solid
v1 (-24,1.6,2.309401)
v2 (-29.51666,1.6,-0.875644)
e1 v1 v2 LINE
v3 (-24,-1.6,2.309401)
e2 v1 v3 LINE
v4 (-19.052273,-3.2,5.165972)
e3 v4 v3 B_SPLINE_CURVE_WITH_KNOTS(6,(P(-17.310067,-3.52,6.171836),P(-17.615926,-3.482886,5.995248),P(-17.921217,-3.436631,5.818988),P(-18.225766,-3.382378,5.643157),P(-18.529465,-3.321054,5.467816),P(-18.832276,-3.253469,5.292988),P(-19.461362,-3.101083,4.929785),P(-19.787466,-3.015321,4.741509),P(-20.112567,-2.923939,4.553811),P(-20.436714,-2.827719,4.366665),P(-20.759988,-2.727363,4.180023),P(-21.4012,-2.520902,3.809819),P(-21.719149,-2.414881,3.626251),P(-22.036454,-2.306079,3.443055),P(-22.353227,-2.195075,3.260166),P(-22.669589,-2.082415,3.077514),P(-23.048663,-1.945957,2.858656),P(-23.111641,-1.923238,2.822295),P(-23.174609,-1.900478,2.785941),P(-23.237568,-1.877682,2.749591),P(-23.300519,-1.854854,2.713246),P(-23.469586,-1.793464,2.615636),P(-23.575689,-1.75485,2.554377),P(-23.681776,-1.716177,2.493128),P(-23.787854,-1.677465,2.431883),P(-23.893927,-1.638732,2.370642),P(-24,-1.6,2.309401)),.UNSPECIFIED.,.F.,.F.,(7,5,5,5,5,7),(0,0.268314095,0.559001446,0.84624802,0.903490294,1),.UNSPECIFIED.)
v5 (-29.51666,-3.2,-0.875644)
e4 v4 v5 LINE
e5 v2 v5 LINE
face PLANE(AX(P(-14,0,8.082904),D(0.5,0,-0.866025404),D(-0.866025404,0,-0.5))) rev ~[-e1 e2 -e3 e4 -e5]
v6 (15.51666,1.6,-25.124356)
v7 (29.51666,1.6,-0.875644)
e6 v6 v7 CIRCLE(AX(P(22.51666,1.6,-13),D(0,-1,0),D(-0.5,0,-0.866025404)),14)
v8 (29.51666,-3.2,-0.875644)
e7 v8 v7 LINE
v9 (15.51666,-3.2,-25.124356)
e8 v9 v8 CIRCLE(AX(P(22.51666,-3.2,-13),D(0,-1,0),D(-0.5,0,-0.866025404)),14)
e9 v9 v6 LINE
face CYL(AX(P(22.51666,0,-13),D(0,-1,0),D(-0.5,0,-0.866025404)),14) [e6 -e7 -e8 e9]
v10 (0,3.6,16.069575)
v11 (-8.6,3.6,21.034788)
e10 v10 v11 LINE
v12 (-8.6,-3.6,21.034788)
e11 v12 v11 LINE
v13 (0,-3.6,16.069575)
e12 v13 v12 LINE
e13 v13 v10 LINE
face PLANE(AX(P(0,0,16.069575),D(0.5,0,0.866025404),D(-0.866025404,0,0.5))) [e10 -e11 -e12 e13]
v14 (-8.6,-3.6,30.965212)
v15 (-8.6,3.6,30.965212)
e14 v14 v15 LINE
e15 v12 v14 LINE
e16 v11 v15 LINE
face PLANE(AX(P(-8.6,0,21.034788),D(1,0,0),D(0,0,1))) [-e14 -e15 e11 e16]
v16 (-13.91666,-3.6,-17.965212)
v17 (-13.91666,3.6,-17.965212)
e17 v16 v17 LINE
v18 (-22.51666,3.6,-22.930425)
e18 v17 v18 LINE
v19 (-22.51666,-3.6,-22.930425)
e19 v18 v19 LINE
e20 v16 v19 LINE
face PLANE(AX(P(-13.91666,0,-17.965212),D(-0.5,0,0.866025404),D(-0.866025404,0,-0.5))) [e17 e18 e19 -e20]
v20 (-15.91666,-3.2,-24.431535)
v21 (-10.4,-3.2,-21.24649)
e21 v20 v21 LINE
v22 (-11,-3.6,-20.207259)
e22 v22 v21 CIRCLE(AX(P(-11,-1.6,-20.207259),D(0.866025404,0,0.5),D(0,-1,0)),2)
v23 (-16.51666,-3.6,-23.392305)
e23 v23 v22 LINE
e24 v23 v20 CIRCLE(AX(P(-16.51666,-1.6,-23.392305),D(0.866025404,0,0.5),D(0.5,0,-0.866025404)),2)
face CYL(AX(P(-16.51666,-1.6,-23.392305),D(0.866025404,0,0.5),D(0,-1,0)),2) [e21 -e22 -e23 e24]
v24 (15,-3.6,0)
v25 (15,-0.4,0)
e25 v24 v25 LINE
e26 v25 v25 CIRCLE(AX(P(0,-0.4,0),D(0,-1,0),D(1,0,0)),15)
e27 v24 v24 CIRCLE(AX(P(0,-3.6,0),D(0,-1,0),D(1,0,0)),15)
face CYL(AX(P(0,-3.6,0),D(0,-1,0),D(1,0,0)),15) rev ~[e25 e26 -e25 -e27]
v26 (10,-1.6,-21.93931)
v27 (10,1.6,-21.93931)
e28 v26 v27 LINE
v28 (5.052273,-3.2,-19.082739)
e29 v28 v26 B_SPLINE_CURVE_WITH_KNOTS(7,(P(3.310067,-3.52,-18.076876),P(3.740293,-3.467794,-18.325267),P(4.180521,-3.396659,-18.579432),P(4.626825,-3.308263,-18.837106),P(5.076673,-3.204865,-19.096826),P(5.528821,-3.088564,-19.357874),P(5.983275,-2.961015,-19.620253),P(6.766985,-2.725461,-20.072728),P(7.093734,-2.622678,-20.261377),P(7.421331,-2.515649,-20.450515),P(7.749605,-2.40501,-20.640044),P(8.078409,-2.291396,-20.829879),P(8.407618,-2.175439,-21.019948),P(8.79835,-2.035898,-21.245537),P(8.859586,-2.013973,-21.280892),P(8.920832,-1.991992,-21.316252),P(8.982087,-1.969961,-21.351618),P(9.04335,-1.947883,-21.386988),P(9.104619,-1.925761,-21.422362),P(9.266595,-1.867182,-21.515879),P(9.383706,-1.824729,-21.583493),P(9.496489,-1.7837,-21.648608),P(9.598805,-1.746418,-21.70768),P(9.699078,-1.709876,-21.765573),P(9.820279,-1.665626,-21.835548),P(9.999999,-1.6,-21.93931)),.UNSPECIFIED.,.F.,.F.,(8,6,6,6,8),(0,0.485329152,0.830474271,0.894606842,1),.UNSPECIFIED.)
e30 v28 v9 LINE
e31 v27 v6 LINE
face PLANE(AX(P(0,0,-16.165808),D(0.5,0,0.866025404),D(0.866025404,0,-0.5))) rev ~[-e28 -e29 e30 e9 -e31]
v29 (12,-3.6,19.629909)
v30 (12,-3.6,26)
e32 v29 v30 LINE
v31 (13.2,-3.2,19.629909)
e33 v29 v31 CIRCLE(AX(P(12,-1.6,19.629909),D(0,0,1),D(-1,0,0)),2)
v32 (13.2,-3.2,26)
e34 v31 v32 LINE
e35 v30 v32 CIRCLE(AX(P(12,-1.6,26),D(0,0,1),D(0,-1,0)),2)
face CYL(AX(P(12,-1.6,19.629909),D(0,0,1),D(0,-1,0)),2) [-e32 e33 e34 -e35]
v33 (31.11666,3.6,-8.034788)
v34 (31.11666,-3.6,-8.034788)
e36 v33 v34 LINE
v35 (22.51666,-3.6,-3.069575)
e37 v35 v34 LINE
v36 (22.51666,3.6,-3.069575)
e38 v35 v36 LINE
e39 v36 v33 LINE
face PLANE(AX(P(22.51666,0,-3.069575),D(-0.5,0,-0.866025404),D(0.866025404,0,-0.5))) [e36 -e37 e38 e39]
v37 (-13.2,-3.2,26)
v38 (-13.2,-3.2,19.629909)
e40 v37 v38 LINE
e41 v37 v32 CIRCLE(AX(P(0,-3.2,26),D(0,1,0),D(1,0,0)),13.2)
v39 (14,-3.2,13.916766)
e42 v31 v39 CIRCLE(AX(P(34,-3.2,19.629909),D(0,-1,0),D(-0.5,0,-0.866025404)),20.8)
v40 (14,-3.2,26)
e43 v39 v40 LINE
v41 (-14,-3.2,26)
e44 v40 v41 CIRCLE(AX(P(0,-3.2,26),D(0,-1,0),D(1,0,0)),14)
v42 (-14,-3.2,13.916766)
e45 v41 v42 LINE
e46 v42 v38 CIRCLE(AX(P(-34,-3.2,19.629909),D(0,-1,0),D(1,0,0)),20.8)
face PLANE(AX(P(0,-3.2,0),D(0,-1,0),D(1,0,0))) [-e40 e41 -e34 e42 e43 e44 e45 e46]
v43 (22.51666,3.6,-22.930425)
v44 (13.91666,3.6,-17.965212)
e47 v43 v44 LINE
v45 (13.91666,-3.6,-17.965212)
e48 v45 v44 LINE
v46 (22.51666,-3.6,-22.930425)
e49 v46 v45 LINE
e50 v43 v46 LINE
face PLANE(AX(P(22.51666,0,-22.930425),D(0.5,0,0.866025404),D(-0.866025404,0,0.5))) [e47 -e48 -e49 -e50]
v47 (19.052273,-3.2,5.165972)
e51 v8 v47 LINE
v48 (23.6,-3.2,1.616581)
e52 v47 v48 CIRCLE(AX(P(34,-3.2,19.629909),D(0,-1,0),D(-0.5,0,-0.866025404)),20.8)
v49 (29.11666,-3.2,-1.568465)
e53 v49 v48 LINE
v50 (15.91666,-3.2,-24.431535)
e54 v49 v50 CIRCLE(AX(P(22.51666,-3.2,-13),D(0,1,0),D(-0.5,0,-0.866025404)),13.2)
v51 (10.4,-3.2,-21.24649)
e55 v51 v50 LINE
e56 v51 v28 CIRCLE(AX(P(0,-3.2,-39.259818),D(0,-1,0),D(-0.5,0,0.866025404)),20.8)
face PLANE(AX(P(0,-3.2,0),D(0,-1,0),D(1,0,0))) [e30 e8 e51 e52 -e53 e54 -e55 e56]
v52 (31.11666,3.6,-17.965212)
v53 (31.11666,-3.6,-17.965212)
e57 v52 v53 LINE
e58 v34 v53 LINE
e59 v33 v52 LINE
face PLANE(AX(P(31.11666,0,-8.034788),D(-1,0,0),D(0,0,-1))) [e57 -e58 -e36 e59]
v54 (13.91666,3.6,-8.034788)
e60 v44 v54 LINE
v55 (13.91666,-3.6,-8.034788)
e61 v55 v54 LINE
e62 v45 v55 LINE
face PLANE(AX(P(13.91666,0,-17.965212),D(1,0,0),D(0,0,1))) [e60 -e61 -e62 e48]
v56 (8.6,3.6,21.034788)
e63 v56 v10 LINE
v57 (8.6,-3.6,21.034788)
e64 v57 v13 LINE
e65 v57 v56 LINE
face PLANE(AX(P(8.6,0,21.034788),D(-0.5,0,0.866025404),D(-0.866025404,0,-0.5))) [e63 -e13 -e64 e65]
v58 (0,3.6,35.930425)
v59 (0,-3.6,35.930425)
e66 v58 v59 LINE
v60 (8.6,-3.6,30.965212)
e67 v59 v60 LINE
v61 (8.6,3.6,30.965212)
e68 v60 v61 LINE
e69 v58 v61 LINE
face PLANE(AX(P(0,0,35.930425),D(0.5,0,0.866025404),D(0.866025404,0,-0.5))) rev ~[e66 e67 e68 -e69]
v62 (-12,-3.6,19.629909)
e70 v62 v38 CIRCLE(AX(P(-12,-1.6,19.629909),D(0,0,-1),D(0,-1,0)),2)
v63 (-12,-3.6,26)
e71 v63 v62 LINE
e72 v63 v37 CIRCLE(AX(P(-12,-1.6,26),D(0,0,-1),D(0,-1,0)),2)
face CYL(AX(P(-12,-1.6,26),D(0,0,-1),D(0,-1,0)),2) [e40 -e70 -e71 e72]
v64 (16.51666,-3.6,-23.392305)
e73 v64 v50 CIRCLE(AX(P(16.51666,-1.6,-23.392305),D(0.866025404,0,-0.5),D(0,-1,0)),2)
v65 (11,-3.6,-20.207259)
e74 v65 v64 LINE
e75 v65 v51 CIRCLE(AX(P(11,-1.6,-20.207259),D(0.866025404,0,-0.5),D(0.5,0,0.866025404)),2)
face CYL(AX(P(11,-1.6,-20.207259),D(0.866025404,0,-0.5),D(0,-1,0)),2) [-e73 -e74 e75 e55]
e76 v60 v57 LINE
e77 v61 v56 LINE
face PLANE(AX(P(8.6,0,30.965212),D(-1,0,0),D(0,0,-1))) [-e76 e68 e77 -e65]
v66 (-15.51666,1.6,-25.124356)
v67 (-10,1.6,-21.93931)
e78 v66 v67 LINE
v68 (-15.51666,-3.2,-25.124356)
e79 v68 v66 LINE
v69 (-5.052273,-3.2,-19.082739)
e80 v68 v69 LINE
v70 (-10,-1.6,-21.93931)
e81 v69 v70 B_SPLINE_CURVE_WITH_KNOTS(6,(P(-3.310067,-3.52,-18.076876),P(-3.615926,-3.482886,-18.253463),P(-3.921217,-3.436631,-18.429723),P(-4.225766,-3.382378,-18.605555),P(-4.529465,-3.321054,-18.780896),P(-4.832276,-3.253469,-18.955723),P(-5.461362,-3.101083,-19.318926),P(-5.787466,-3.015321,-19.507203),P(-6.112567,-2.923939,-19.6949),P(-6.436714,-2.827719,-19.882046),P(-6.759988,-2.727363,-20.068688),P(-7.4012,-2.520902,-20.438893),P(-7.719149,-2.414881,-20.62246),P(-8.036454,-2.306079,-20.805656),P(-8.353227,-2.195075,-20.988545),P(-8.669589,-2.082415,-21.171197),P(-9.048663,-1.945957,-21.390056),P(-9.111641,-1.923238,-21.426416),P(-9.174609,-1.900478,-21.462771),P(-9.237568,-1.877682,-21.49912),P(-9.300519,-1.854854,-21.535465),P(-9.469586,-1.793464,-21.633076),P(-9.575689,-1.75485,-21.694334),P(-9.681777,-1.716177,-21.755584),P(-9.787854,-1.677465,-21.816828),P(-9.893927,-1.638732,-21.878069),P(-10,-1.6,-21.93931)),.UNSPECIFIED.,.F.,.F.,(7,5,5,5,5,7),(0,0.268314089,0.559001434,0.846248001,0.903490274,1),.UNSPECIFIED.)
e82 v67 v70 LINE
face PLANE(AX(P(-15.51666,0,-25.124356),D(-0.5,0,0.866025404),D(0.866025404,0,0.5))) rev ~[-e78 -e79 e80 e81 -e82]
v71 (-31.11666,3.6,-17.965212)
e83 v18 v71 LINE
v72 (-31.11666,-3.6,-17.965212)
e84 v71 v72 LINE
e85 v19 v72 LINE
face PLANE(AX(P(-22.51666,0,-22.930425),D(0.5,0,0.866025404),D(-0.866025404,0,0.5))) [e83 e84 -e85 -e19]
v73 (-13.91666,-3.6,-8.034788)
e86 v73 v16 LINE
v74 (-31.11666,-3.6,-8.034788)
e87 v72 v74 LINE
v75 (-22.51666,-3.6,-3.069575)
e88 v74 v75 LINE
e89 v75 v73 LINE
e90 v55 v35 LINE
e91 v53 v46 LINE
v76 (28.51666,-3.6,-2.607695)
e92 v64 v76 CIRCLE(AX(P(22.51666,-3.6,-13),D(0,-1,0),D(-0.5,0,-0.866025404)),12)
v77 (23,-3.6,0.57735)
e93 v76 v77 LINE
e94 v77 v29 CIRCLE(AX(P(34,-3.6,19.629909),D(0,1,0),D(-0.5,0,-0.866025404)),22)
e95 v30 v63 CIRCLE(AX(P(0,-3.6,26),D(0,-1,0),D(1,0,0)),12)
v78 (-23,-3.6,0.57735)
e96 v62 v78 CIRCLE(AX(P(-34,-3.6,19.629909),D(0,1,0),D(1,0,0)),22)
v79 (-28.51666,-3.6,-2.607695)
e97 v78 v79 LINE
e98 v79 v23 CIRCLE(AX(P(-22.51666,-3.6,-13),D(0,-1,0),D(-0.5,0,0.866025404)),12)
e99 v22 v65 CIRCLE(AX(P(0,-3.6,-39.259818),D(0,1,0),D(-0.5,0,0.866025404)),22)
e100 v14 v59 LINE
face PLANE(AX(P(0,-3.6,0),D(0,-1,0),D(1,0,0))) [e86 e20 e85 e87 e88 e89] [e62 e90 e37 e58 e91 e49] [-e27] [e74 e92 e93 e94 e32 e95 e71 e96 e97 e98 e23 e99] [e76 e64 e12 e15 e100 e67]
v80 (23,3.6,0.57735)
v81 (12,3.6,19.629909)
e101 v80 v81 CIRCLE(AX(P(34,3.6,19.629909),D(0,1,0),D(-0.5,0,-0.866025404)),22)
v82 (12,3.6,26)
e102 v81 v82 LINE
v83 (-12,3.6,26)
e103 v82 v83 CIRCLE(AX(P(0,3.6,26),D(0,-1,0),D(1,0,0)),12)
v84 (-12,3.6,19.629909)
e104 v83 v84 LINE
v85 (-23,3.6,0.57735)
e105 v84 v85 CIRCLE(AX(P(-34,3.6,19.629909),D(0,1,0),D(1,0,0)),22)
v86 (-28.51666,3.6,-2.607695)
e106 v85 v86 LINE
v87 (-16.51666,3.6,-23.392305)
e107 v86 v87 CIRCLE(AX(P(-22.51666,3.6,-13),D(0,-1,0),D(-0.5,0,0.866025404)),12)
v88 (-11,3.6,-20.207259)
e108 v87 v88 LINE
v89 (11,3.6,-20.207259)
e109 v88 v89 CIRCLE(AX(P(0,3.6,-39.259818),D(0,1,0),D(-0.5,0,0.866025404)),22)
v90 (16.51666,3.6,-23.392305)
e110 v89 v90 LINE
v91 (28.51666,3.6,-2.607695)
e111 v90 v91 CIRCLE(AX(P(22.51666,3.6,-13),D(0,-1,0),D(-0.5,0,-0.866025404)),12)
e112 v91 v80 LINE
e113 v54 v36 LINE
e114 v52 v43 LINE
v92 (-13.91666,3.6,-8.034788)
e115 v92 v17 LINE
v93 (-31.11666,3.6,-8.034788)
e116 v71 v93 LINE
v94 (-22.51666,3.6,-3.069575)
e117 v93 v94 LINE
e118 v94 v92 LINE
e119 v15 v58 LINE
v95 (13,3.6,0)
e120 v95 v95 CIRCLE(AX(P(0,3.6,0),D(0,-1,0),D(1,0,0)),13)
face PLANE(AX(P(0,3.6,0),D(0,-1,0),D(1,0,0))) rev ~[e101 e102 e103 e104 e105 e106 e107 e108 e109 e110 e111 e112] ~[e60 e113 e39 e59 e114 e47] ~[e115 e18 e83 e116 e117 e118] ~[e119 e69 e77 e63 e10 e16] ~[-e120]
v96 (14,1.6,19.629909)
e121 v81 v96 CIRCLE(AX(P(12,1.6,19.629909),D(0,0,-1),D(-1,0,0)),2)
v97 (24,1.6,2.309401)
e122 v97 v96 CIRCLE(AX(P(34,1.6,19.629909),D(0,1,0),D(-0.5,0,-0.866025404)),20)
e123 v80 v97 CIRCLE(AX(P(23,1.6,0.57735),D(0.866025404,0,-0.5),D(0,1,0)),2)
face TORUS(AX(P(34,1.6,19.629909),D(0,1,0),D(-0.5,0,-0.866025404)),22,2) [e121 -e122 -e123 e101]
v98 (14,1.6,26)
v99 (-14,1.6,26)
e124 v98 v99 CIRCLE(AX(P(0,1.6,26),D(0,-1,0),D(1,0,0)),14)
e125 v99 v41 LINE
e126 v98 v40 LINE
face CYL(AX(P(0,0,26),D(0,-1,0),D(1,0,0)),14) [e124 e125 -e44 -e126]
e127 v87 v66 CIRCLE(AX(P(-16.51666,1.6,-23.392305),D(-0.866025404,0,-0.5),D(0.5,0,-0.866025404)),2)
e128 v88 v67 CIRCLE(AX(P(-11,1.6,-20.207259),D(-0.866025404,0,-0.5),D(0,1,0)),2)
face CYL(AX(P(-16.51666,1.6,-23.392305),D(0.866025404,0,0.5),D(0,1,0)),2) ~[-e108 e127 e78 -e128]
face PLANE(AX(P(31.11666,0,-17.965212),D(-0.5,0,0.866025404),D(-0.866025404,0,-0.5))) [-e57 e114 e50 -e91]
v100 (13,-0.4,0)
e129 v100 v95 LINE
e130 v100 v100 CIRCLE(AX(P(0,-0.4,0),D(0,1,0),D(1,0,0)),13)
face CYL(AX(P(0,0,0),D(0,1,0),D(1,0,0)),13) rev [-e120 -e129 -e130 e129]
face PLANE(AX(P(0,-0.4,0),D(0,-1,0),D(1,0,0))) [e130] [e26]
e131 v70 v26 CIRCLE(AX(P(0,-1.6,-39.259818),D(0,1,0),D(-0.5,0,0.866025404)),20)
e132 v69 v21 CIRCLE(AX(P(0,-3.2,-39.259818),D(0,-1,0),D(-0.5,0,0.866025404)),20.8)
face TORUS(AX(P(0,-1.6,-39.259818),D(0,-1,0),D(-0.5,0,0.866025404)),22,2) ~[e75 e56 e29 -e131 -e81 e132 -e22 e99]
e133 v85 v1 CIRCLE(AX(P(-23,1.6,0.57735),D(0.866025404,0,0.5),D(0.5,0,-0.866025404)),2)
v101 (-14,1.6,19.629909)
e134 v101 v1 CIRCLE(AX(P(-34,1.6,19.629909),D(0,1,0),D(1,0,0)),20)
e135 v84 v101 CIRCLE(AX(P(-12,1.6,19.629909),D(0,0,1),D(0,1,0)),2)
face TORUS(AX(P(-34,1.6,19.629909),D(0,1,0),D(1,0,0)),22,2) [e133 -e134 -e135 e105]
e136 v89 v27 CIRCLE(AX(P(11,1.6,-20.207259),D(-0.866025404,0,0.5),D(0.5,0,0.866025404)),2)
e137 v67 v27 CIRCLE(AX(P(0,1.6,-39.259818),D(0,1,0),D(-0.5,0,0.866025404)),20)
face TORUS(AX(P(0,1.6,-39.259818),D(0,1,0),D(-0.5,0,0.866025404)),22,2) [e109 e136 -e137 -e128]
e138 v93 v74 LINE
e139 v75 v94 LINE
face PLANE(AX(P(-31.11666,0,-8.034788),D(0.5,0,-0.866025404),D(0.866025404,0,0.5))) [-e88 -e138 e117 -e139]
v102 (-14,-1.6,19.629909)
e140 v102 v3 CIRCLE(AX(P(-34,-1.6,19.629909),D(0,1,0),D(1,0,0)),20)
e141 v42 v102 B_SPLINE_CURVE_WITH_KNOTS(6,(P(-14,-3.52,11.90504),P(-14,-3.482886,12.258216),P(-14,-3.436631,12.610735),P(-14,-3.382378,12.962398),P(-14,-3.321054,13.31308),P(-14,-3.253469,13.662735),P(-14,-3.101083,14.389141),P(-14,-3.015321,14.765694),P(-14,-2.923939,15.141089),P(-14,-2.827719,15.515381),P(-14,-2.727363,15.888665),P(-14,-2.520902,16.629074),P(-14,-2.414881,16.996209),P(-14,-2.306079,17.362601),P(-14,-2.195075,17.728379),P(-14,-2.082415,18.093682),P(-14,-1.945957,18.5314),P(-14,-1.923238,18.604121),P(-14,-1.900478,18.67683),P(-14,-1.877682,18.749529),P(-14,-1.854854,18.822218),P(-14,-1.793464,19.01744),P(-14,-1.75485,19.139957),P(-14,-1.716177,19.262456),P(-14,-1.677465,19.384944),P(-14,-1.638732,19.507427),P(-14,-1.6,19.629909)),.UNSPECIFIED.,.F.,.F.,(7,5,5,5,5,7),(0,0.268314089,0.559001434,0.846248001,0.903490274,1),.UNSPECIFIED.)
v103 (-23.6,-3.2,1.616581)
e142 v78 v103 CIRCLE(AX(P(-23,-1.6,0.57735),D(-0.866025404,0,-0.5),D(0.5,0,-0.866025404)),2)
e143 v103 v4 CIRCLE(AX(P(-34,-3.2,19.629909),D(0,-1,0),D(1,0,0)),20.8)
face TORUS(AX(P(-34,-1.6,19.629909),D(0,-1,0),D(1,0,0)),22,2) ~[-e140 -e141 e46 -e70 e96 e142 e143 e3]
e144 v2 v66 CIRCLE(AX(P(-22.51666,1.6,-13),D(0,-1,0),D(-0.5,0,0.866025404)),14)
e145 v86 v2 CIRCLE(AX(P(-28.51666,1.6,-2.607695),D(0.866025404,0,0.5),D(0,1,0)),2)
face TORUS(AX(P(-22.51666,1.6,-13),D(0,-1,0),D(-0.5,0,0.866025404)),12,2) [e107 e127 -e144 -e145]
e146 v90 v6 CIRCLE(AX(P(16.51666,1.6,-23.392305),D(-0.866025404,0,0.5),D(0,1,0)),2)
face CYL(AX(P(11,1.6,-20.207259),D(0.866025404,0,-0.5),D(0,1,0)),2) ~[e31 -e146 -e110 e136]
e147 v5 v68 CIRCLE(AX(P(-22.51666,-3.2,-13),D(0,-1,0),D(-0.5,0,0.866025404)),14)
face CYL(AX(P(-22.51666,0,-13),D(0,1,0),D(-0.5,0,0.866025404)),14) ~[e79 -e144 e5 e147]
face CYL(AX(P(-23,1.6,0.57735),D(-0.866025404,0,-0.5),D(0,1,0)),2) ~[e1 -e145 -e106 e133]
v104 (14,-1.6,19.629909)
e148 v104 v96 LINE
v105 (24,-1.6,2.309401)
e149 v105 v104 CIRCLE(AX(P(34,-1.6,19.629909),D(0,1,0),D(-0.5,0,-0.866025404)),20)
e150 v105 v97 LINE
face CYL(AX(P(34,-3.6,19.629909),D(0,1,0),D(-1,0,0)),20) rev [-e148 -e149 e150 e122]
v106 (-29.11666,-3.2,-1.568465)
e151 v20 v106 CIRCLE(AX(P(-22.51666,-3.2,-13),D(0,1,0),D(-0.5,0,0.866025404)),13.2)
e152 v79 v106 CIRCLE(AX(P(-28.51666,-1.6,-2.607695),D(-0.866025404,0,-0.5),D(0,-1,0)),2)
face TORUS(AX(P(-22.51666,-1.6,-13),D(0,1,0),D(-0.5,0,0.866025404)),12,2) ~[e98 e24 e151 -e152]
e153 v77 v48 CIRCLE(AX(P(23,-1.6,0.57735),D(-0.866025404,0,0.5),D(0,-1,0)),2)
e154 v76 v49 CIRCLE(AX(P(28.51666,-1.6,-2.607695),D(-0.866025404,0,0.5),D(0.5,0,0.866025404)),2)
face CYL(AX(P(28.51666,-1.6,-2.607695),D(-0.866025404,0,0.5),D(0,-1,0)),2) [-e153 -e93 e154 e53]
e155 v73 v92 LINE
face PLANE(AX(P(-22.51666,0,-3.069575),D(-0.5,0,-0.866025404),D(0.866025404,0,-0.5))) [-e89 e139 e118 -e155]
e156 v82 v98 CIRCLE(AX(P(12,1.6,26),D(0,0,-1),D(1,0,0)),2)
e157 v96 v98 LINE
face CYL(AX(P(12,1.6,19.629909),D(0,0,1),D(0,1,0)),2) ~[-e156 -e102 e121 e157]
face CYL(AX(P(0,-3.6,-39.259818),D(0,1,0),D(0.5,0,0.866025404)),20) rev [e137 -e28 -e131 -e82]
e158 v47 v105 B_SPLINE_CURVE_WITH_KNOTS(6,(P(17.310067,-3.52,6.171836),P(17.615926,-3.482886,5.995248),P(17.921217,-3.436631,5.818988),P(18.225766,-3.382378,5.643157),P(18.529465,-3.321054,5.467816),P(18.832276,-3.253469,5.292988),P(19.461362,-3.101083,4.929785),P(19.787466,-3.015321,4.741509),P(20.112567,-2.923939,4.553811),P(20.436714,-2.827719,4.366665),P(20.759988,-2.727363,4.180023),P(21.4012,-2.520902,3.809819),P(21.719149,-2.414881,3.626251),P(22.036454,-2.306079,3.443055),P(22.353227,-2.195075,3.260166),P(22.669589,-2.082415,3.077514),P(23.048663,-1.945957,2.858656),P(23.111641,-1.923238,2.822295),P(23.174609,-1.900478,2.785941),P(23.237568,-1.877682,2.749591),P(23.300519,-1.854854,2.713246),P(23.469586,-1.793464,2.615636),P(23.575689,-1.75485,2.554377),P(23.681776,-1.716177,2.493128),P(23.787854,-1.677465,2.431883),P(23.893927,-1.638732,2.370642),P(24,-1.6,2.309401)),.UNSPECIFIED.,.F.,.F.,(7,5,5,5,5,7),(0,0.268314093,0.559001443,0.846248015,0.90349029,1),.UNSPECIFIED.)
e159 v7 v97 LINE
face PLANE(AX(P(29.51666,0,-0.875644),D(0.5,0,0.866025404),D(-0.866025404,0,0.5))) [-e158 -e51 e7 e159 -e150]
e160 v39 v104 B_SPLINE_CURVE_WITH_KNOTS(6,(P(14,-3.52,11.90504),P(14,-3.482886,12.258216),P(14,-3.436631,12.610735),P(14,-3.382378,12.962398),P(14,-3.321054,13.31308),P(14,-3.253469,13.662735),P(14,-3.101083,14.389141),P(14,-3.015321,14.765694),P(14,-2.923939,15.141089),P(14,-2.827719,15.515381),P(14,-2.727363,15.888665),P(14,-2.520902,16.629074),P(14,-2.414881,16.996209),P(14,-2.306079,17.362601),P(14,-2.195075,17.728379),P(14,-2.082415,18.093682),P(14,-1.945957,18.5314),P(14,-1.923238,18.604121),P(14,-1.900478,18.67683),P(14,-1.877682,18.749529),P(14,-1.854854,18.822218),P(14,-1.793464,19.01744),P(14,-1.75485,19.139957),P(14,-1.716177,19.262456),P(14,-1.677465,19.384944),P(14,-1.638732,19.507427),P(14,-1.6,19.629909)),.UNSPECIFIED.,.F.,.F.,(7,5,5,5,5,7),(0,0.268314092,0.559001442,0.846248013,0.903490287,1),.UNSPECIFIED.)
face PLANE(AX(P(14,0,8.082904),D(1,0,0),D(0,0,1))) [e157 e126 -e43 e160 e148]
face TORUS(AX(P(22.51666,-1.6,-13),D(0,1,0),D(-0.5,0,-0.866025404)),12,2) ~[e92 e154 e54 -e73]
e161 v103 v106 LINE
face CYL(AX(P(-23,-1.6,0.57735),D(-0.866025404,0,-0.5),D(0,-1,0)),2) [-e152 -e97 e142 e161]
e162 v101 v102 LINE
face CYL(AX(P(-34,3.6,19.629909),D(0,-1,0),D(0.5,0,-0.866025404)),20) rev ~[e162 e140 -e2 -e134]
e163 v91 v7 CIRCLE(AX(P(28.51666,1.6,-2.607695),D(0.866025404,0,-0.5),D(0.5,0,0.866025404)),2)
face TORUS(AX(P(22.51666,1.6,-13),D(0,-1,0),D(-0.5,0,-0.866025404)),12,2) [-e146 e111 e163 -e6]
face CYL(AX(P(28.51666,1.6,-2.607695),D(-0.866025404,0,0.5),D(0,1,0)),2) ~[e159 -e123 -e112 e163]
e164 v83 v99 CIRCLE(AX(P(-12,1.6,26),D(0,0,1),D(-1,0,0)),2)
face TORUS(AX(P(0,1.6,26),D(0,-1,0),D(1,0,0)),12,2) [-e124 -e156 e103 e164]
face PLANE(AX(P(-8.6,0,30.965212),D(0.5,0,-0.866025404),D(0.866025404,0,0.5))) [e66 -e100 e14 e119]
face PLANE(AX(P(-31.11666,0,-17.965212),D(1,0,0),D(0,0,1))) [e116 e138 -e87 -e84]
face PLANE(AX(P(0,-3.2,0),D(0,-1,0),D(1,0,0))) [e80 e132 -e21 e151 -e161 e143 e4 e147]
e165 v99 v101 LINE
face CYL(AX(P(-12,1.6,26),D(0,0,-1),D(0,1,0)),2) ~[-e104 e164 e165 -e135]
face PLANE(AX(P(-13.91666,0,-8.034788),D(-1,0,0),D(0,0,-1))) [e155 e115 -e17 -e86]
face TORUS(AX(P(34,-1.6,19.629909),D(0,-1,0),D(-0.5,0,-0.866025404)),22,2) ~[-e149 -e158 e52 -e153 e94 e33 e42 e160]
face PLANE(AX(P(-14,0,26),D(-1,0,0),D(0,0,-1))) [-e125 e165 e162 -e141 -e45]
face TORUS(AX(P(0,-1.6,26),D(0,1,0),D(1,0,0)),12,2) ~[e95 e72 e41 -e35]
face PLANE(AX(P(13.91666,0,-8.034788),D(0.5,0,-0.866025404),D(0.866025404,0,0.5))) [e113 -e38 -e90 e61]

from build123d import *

# Parameters (mm, degrees)
F0_R     = 13
F1_DEPTH = 3.6
F2_R     = 20
F3_R     = 2
F4_R     = 2
F5_DEPTH = 3.2
F6_R     = 15
F7_DEPTH = 3.2


# Not quite as in the source:
# - a feature names something its author has since deleted; it is built from what else it names


with BuildPart() as f1:
    # F0 (on Front) → F1 (new body, symmetric)
    with BuildSketch(Plane.XZ):
        with BuildLine():
            Line((14, 8.0829037687), (14, 26))
            ThreePointArc((14, 26), (0, 40), (-14, 26))
            Line((-14, 26), (-14, 8.0829037687))
            Line((-14, 8.0829037687), (-29.5166604984, -0.875644347))
            ThreePointArc((-29.5166604984, -0.875644347), (-34.6410161514, -20), (-15.5166604984, -25.124355653))
            Line((-15.5166604984, -25.124355653), (0, -16.1658075373))
            Line((0, -16.1658075373), (15.5166604984, -25.124355653))
            ThreePointArc((15.5166604984, -25.124355653), (34.6410161514, -20), (29.5166604984, -0.875644347))
            Line((29.5166604984, -0.875644347), (14, 8.0829037687))
        make_face()
        Polygon((-22.5166604984, -22.9304246301), (-31.1166604984, -17.965212315), (-31.1166604984, -8.034787685), (-22.5166604984, -3.0695753699), (-13.9166604984, -8.034787685), (-13.9166604984, -17.965212315), align=None, mode=Mode.SUBTRACT)
        Polygon((31.1166604984, -8.034787685), (31.1166604984, -17.965212315), (22.5166604984, -22.9304246301), (13.9166604984, -17.965212315), (13.9166604984, -8.034787685), (22.5166604984, -3.0695753699), align=None, mode=Mode.SUBTRACT)
        Circle(F0_R, mode=Mode.SUBTRACT)
        Polygon((0, 35.9304246301), (8.6, 30.965212315), (8.6, 21.034787685), (0, 16.0695753699), (-8.6, 21.034787685), (-8.6, 30.965212315), align=None, mode=Mode.SUBTRACT)
    extrude(amount=F1_DEPTH, both=True)

    # F2
    f2_edges = [f1.edges().sort_by_distance(p)[0] for p in [
        (0, 0, -16.165808),
        (14, 0, 8.082904),
        (-14, 0, 8.082904),
    ]]
    fillet(f2_edges, radius=F2_R)

    # F3
    f3_edges = [f1.edges().sort_by_distance(p)[0] for p in [
        (-14, -3.6, 22.814955),
    ]]
    fillet(f3_edges, radius=F3_R)

    # F4
    f4_edges = [f1.edges().sort_by_distance(p)[0] for p in [
        (0, 3.6, 40),
        (26.75833, 3.6, 0.716878),
        (16.679492, 3.6, 9.629909),
        (34.641016, 3.6, -20),
        (14, 3.6, 22.814955),
        (12.75833, 3.6, -23.531833),
        (0, 3.6, -19.259818),
        (-14, 3.6, 22.814955),
        (-12.75833, 3.6, -23.531833),
        (-16.679492, 3.6, 9.629909),
        (-34.641016, 3.6, -20),
        (-26.75833, 3.6, 0.716878),
    ]]
    fillet(f4_edges, radius=F4_R)

    # F0 (on Front) → F5 (join)
    with BuildSketch(Plane.XZ):
        with BuildLine():
            Line((14, 8.0829037687), (14, 26))
            ThreePointArc((14, 26), (0, 40), (-14, 26))
            Line((-14, 26), (-14, 8.0829037687))
            Line((-14, 8.0829037687), (-29.5166604984, -0.875644347))
            ThreePointArc((-29.5166604984, -0.875644347), (-34.6410161514, -20), (-15.5166604984, -25.124355653))
            Line((-15.5166604984, -25.124355653), (0, -16.1658075373))
            Line((0, -16.1658075373), (15.5166604984, -25.124355653))
            ThreePointArc((15.5166604984, -25.124355653), (34.6410161514, -20), (29.5166604984, -0.875644347))
            Line((29.5166604984, -0.875644347), (14, 8.0829037687))
        make_face()
        Polygon((-22.5166604984, -22.9304246301), (-31.1166604984, -17.965212315), (-31.1166604984, -8.034787685), (-22.5166604984, -3.0695753699), (-13.9166604984, -8.034787685), (-13.9166604984, -17.965212315), align=None, mode=Mode.SUBTRACT)
        Polygon((31.1166604984, -8.034787685), (31.1166604984, -17.965212315), (22.5166604984, -22.9304246301), (13.9166604984, -17.965212315), (13.9166604984, -8.034787685), (22.5166604984, -3.0695753699), align=None, mode=Mode.SUBTRACT)
        Circle(F0_R, mode=Mode.SUBTRACT)
        Polygon((0, 35.9304246301), (8.6, 30.965212315), (8.6, 21.034787685), (0, 16.0695753699), (-8.6, 21.034787685), (-8.6, 30.965212315), align=None, mode=Mode.SUBTRACT)
    extrude(amount=F5_DEPTH)

    # F6 (on face) → F7 (cut)
    with BuildSketch(Plane.XZ.offset(3.6)):
        Circle(F6_R)
    extrude(amount=-F7_DEPTH, mode=Mode.SUBTRACT)


solid = f1.part
